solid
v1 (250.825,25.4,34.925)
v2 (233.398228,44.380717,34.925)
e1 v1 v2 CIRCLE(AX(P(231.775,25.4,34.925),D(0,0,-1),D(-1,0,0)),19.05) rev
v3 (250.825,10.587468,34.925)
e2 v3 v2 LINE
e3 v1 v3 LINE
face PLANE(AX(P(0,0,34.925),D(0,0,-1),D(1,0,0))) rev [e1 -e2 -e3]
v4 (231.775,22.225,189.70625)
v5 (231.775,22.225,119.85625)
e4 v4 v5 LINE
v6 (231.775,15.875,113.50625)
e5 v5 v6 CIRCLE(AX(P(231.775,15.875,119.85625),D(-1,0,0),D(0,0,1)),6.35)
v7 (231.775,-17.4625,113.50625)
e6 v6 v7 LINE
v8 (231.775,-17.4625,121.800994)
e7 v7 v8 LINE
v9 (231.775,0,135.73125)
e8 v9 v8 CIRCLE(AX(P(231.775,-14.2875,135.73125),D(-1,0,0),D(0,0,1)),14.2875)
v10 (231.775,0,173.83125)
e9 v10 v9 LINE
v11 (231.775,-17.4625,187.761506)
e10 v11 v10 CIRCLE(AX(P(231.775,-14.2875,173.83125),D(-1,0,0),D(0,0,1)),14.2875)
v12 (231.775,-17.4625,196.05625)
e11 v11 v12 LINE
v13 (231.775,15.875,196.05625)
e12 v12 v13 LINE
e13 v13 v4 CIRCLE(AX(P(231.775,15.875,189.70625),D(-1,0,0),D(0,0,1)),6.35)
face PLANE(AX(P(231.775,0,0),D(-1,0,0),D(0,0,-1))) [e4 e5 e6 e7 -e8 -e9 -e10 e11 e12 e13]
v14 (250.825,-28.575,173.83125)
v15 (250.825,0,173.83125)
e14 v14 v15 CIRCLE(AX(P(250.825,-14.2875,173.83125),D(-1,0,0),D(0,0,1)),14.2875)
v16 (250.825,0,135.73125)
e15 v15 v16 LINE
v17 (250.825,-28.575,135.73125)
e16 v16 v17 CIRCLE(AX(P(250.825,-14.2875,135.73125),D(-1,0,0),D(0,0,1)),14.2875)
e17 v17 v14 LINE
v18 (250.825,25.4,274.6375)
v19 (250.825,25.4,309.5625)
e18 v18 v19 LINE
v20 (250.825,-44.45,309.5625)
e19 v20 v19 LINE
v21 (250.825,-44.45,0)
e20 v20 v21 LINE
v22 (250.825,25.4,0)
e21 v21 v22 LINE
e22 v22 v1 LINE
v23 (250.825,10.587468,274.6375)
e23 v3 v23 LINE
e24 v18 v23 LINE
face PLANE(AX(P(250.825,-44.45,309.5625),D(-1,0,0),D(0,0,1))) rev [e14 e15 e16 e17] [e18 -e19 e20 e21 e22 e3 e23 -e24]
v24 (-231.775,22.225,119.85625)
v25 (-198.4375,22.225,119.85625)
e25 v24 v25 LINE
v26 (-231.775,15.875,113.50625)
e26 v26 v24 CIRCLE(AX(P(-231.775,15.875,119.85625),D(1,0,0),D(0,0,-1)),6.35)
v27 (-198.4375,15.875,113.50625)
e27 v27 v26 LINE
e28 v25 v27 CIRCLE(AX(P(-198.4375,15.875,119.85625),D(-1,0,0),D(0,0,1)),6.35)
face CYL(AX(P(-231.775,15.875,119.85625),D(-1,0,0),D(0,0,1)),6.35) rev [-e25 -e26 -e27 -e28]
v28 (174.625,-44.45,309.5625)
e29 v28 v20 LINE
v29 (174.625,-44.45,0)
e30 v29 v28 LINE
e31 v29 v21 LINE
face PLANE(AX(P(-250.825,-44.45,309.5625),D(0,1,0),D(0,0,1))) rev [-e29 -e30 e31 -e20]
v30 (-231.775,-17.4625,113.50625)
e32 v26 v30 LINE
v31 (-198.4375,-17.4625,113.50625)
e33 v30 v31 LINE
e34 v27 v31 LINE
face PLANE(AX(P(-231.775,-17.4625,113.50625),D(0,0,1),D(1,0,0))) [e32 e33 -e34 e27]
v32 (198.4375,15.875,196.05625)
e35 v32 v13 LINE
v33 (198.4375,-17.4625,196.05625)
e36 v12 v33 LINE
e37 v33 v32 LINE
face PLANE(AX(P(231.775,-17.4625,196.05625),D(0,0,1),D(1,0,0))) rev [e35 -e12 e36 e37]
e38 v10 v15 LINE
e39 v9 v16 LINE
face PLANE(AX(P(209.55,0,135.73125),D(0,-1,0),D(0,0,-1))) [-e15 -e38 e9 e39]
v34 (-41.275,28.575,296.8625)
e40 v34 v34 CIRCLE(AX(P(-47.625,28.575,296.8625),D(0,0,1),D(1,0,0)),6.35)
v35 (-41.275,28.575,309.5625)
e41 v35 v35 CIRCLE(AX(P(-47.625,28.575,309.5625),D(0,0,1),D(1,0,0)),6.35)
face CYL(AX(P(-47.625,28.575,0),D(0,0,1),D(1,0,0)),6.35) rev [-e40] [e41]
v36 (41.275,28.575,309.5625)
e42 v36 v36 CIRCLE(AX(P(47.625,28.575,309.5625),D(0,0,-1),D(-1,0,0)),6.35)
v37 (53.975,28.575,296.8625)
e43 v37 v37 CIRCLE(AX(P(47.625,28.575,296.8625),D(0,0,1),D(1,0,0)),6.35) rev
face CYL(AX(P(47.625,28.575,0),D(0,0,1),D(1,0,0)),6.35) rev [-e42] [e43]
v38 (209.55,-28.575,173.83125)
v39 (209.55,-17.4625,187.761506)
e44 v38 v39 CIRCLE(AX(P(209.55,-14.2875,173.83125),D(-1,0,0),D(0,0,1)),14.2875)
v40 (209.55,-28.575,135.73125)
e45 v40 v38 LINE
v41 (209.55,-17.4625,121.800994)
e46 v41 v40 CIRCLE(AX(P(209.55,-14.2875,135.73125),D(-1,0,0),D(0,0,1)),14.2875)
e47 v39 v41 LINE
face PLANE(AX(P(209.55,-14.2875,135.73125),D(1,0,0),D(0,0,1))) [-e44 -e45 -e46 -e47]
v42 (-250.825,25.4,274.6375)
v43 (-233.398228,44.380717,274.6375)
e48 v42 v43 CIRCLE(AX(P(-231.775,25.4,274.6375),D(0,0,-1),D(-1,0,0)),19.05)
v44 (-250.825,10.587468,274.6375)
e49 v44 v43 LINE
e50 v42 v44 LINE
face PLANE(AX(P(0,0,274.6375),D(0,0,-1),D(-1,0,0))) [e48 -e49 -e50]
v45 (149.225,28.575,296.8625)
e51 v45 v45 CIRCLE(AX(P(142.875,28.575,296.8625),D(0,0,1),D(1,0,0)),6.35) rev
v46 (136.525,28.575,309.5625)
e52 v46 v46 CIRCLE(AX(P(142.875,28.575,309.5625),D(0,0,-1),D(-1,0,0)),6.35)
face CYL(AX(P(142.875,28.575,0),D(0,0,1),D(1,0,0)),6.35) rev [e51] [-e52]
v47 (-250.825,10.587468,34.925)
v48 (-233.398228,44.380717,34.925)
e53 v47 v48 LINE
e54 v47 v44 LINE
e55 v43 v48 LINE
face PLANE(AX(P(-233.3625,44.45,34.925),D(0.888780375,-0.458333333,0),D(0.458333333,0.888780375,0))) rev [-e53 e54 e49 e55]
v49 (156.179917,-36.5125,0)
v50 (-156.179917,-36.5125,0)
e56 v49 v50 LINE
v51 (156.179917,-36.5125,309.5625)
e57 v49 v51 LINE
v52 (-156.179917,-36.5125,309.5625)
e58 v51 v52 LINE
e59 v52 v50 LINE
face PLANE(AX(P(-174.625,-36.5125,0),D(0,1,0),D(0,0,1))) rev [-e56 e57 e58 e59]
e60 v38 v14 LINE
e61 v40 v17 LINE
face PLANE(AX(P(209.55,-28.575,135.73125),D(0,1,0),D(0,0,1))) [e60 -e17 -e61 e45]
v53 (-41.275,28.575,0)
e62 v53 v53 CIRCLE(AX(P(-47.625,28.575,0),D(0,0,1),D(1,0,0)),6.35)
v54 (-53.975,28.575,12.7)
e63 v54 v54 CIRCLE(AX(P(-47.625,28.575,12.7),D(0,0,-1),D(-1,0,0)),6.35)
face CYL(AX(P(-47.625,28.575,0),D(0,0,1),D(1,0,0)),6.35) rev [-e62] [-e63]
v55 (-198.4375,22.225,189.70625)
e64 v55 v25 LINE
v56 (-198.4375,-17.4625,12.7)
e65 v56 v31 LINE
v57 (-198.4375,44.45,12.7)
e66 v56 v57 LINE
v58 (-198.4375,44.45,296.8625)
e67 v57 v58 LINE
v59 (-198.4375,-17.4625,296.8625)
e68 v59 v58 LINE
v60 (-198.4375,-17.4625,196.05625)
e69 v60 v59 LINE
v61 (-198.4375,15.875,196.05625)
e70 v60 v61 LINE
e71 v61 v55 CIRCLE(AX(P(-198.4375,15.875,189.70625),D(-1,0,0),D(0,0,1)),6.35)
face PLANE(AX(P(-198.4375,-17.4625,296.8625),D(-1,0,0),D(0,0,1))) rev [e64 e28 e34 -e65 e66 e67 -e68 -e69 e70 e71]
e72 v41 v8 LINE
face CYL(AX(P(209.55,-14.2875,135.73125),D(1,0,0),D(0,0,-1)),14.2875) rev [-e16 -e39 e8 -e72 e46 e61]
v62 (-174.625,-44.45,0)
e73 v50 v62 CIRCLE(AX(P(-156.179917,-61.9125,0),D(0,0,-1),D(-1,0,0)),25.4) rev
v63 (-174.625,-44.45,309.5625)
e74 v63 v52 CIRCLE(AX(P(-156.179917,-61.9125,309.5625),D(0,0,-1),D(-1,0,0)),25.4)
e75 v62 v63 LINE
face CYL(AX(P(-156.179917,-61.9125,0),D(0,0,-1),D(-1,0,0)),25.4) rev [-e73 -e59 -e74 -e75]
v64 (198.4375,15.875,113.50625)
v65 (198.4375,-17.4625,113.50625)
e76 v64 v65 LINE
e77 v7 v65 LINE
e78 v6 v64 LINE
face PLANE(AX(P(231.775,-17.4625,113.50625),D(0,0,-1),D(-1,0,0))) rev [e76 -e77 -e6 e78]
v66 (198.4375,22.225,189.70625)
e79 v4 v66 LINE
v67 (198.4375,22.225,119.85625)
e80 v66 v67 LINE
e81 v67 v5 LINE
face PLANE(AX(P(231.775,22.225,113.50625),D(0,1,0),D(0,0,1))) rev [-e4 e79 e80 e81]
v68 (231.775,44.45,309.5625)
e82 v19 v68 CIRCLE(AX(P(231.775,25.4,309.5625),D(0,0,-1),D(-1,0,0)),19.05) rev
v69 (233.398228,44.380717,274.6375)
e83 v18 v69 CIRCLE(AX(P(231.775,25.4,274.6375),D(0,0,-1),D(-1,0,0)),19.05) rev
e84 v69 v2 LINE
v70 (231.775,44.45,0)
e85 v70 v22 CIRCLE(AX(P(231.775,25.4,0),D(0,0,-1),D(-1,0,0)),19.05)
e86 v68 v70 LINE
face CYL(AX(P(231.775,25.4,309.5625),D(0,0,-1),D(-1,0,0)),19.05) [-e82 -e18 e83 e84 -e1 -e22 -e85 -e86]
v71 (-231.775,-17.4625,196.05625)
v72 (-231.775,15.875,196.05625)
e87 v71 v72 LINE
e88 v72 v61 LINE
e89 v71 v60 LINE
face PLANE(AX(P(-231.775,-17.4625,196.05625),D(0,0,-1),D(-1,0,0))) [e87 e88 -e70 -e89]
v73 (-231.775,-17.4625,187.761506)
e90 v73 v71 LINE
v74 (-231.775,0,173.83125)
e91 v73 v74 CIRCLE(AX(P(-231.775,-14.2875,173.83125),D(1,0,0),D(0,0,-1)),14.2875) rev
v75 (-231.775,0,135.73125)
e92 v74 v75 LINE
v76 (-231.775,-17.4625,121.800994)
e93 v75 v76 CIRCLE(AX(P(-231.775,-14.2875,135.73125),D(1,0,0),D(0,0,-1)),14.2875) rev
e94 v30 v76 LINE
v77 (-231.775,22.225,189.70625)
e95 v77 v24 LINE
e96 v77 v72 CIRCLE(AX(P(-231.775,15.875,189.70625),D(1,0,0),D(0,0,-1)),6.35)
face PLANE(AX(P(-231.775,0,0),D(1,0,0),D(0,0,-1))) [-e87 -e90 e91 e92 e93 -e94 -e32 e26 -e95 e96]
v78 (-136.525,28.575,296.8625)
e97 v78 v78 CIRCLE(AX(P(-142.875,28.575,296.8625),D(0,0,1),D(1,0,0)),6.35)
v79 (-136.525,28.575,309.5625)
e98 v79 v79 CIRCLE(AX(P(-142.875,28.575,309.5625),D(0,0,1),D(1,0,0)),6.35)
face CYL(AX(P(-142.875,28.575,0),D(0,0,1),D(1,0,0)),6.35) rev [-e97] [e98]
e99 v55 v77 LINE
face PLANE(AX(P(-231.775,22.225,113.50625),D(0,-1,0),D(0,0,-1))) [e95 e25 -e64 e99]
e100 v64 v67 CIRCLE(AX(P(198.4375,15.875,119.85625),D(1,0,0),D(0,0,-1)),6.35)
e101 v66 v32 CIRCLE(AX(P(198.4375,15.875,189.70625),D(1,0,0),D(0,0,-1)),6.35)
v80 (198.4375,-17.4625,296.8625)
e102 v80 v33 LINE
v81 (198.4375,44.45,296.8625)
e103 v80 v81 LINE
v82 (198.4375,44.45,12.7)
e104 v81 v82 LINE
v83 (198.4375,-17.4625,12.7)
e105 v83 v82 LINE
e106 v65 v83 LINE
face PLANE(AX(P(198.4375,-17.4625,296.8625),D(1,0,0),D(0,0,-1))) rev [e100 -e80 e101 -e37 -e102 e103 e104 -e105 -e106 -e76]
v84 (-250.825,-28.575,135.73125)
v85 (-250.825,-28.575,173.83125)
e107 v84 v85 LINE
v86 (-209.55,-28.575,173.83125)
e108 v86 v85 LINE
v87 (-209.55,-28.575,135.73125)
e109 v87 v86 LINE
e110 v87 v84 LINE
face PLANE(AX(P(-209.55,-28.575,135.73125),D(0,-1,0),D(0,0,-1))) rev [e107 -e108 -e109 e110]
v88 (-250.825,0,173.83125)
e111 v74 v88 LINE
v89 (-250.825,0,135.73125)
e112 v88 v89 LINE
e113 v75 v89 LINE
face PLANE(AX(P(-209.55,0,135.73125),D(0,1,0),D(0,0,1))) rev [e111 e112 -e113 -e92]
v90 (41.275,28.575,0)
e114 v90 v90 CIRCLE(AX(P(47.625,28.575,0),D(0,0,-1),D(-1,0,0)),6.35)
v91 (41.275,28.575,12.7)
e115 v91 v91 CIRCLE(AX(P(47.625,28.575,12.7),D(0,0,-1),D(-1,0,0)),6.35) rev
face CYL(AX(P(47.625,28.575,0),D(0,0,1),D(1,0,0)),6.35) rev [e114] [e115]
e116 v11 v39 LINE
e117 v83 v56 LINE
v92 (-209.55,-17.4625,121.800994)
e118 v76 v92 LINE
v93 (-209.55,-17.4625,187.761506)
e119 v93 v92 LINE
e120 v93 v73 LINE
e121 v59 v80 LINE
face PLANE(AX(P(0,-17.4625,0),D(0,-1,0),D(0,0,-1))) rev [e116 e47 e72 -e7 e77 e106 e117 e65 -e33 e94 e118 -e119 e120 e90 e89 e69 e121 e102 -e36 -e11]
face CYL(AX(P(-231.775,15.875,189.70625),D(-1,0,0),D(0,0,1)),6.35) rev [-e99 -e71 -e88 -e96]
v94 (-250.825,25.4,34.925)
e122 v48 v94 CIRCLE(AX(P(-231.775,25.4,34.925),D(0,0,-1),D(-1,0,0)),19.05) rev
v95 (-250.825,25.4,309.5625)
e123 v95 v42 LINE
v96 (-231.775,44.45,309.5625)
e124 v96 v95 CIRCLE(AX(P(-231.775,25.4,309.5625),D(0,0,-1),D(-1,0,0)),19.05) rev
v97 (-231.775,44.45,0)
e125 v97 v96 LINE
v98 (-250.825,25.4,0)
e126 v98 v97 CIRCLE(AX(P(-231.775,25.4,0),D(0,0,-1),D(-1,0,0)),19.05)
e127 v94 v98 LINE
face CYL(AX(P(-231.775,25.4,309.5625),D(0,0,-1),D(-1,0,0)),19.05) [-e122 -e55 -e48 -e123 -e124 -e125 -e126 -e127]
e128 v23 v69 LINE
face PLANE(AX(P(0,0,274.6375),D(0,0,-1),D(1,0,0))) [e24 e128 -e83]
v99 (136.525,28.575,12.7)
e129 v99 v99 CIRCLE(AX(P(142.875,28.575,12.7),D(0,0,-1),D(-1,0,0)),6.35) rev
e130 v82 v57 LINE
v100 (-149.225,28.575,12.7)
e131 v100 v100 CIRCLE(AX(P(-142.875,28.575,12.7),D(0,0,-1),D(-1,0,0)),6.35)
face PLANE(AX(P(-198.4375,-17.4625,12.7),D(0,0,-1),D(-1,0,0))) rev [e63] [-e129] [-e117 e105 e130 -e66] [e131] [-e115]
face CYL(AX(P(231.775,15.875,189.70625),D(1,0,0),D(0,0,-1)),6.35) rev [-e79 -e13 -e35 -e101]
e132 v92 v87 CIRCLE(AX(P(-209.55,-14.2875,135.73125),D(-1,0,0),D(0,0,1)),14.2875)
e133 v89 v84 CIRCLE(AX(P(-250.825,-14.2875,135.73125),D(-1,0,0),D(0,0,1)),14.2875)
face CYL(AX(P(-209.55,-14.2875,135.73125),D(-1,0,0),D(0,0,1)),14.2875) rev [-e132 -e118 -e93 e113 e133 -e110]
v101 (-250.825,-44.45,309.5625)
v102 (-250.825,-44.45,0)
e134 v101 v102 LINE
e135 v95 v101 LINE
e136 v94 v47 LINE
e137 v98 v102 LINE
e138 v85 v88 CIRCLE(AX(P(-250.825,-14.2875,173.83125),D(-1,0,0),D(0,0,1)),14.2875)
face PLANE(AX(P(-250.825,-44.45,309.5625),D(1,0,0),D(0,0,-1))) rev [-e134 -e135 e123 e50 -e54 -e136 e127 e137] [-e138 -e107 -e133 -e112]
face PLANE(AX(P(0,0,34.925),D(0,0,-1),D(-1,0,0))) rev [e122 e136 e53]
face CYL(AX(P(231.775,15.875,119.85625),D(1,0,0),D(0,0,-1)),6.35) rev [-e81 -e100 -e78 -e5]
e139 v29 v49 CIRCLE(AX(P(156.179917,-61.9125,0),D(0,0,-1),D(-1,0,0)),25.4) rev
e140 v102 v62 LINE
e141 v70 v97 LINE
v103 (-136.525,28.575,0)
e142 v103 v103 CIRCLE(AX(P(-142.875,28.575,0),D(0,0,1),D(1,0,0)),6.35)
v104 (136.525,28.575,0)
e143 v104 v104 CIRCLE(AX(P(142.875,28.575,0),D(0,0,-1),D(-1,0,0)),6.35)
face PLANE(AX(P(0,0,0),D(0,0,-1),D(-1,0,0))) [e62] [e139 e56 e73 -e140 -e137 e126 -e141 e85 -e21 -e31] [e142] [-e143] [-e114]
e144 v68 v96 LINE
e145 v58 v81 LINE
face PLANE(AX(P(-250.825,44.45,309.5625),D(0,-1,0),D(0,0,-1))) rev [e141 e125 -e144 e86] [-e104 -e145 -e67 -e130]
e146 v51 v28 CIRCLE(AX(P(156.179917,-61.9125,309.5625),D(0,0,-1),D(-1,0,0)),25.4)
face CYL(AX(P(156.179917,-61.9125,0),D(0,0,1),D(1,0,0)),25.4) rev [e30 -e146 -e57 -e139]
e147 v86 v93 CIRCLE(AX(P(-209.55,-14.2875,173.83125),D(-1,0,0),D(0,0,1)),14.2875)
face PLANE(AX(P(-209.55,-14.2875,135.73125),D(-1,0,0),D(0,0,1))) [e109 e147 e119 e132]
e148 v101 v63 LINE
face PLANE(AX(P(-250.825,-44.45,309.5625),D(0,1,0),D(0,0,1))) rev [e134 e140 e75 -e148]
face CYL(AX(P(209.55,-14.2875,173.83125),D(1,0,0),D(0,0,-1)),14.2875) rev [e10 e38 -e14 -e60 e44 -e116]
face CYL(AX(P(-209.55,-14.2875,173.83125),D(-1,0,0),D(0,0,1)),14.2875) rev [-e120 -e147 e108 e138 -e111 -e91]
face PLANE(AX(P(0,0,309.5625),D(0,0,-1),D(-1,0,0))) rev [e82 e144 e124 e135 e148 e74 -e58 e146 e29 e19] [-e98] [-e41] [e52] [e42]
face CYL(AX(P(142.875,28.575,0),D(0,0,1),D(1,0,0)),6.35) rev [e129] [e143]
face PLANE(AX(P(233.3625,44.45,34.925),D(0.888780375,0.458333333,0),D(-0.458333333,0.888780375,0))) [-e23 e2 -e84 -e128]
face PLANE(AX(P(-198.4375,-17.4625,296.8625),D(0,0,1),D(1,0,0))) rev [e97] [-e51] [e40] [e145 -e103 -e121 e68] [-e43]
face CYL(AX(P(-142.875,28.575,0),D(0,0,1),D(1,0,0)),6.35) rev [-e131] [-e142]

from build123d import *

# Parameters (mm, degrees)
SKETCH1_W            = 501.65
SKETCH1_H            = 88.9
BOSS_EXTRUDE1_DEPTH  = 309.5625
SKETCH2_W            = 349.25
SKETCH2_H            = 7.9375
CUT_EXTRUDE1_DEPTH   = 401.896401245
FILLET1_R            = 25.4
CUT_EXTRUDE2_DEPTH   = 119.85625
FILLET2_R            = 19.05
CUT_EXTRUDE4_DEPTH   = 41.275
SKETCH4_W            = 396.875
SKETCH4_H            = 284.1625
CUT_EXTRUDE3_DEPTH   = 61.9125
SKETCH6_W            = 82.55
SKETCH6_H            = 39.6875
CUT_EXTRUDE5_DEPTH   = 33.3375
FILLET3_R            = 6.35
SKETCH7_R            = 6.35
CUT_EXTRUDE6_DEPTH   = 401.896401245
FILLET3_OF_MIRROR5_R = 6.35


# Some blends are built 0.0001 mm under size
with BuildPart() as part:
    # Sketch1 → Boss-Extrude1 (new body)
    with BuildSketch(Plane.XY):
        Rectangle(SKETCH1_W, SKETCH1_H)
    extrude(amount=BOSS_EXTRUDE1_DEPTH)

    # Sketch2 → Cut-Extrude1 (cut, through all)
    with BuildSketch(Plane.XY.offset(309.5625)):
        with Locations((0, -40.48125)):
            Rectangle(SKETCH2_W, SKETCH2_H)
    extrude(amount=-CUT_EXTRUDE1_DEPTH, mode=Mode.SUBTRACT)

    # Fillet1
    # the kernel refuses this fillet: 25.4 mm, written as the material it adds along each edge
    with BuildSketch(Plane(origin=(174.625, -36.5125, 309.5625), x_dir=(0, -1, 0), z_dir=(0, 0, -1))) as fillet1_piece_1:
        with BuildLine():
            CenterArc((25.4, 18.445083186), FILLET1_R, 180, 46.567463442)
            Line((0, 18.445083186), (-0.508, 18.445083186))
            Line((-0.508, 18.445083186), (-0.508, 0))
            Line((-0.508, 0), (0, -0.508))
            ThreePointArc((0, -0.508), (3.96875, -0.508), (7.58825, -0.368901664))
            Line((7.58825, -0.368901664), (7.9375, 0))
        make_face()
    extrude(amount=309.5625)
    with BuildSketch(Plane(origin=(-174.625, -36.5125, 309.5625), x_dir=(0, -1, 0), z_dir=(0, 0, -1))) as fillet1_piece_2:
        with BuildLine():
            CenterArc((25.4, -18.445083186), FILLET1_R, 133.432536558, 46.567463442)
            Line((0, -18.445083186), (-0.508, -18.445083186))
            Line((-0.508, -18.445083186), (-0.508, 0))
            Line((-0.508, 0), (0, 0.508))
            ThreePointArc((0, 0.508), (3.96875, 0.508), (7.58825, 0.368901664))
            Line((7.58825, 0.368901664), (7.9375, 0))
        make_face()
    extrude(amount=309.5625)

    # Sketch3 → Cut-Extrude2 (cut, symmetric)
    with BuildSketch(Plane.XY.offset(154.78125)):
        Polygon((-250.825, 44.45), (-233.3625, 44.45), (-250.825, 10.5874677), align=None)
    cut_extrude2 = extrude(amount=CUT_EXTRUDE2_DEPTH, both=True, mode=Mode.SUBTRACT)

    # Fillet2
    fillet2_edges = [part.edges().sort_by_distance(p)[0] for p in [
        (250.825, 44.45, 154.78125),
    ]]
    fillet(fillet2_edges, radius=FILLET2_R)
    # the kernel refuses this fillet: 19.05 mm, written as the material it takes off along each edge
    with BuildSketch(Plane(origin=(-250.825, 44.45, -47.625), x_dir=(1, 0, 0), z_dir=(0, 0, 1))) as fillet2_2_piece_1:
        with BuildLine():
            CenterArc((FILLET2_R, -FILLET2_R), FILLET2_R, 90, 90)
            Line((0, -FILLET2_R), (-FILLET2_R * 0.02, -FILLET2_R))
            Line((-FILLET2_R * 0.02, -FILLET2_R), (-FILLET2_R * 0.02, FILLET2_R * 0.02))
            Line((-FILLET2_R * 0.02, FILLET2_R * 0.02), (FILLET2_R, FILLET2_R * 0.02))
            Line((FILLET2_R, FILLET2_R * 0.02), (FILLET2_R, 0))
        make_face()
    extrude(amount=130.175, mode=Mode.SUBTRACT)
    fillet2_3_edges = [part.edges().sort_by_distance(p)[0] for p in [
        (-250.825, 44.45, 292.1),
    ]]
    fillet(fillet2_3_edges, radius=FILLET2_R - 0.0001)  # a hair under: the kernel refuses the full size

    # Sketch5 → Cut-Extrude4 (cut)
    with BuildSketch(Plane.ZY.offset(250.825)):
        with BuildLine():
            Line((135.73125, 0), (173.83125, 0))
            ThreePointArc((173.83125, 0), (188.11875, -14.2875), (173.83125, -28.575))
            Line((173.83125, -28.575), (135.73125, -28.575))
            ThreePointArc((135.73125, -28.575), (121.44375, -14.2875), (135.73125, 0))
        make_face()
    cut_extrude4 = extrude(amount=-CUT_EXTRUDE4_DEPTH, mode=Mode.SUBTRACT)

    # Mirror4: Cut-Extrude2, Cut-Extrude4 across plane
    add(cut_extrude2.mirror(Plane.ZY), mode=Mode.SUBTRACT)
    add(cut_extrude4.mirror(Plane.ZY), mode=Mode.SUBTRACT)

    # Sketch4 → Cut-Extrude3 (cut)
    with BuildSketch(Plane(origin=(0, 44.45, 0), x_dir=(1, 0, 0), z_dir=(0, 1, 0))):
        with Locations((0, -154.78125)):
            Rectangle(SKETCH4_W, SKETCH4_H)
    extrude(amount=-CUT_EXTRUDE3_DEPTH, mode=Mode.SUBTRACT)

    # Sketch6 → Cut-Extrude5 (cut)
    with BuildSketch(Plane.ZY.offset(198.4375)):
        with Locations((154.78125, 2.38125)):
            Rectangle(SKETCH6_W, SKETCH6_H)
    cut_extrude5 = extrude(amount=CUT_EXTRUDE5_DEPTH, mode=Mode.SUBTRACT)

    # Fillet3
    fillet3_edges = [part.edges().sort_by_distance(p)[0] for p in [
        (-215.10625, 22.225, 196.05625),
        (-215.10625, 22.225, 113.50625),
    ]]
    fillet(fillet3_edges, radius=FILLET3_R)

    # Sketch7 → Cut-Extrude6 (cut, through all)
    with BuildSketch(Plane.XY.offset(309.5625)):
        with Locations((-47.625, 28.575)):
            Circle(SKETCH7_R)
        with Locations((-142.875, 28.575)):
            Circle(SKETCH7_R)
    cut_extrude6 = extrude(amount=-CUT_EXTRUDE6_DEPTH, mode=Mode.SUBTRACT)

    # Mirror5: Cut-Extrude5, Cut-Extrude6 across plane
    add(cut_extrude5.mirror(Plane.ZY), mode=Mode.SUBTRACT)
    add(cut_extrude6.mirror(Plane.ZY), mode=Mode.SUBTRACT)

    # Fillet3 of Mirror5
    fillet3_of_mirror5_edges = [part.edges().sort_by_distance(p)[0] for p in [
        (215.10625, 22.225, 196.05625),
        (215.10625, 22.225, 113.50625),
    ]]
    fillet(fillet3_of_mirror5_edges, radius=FILLET3_OF_MIRROR5_R)


solid = part.part
